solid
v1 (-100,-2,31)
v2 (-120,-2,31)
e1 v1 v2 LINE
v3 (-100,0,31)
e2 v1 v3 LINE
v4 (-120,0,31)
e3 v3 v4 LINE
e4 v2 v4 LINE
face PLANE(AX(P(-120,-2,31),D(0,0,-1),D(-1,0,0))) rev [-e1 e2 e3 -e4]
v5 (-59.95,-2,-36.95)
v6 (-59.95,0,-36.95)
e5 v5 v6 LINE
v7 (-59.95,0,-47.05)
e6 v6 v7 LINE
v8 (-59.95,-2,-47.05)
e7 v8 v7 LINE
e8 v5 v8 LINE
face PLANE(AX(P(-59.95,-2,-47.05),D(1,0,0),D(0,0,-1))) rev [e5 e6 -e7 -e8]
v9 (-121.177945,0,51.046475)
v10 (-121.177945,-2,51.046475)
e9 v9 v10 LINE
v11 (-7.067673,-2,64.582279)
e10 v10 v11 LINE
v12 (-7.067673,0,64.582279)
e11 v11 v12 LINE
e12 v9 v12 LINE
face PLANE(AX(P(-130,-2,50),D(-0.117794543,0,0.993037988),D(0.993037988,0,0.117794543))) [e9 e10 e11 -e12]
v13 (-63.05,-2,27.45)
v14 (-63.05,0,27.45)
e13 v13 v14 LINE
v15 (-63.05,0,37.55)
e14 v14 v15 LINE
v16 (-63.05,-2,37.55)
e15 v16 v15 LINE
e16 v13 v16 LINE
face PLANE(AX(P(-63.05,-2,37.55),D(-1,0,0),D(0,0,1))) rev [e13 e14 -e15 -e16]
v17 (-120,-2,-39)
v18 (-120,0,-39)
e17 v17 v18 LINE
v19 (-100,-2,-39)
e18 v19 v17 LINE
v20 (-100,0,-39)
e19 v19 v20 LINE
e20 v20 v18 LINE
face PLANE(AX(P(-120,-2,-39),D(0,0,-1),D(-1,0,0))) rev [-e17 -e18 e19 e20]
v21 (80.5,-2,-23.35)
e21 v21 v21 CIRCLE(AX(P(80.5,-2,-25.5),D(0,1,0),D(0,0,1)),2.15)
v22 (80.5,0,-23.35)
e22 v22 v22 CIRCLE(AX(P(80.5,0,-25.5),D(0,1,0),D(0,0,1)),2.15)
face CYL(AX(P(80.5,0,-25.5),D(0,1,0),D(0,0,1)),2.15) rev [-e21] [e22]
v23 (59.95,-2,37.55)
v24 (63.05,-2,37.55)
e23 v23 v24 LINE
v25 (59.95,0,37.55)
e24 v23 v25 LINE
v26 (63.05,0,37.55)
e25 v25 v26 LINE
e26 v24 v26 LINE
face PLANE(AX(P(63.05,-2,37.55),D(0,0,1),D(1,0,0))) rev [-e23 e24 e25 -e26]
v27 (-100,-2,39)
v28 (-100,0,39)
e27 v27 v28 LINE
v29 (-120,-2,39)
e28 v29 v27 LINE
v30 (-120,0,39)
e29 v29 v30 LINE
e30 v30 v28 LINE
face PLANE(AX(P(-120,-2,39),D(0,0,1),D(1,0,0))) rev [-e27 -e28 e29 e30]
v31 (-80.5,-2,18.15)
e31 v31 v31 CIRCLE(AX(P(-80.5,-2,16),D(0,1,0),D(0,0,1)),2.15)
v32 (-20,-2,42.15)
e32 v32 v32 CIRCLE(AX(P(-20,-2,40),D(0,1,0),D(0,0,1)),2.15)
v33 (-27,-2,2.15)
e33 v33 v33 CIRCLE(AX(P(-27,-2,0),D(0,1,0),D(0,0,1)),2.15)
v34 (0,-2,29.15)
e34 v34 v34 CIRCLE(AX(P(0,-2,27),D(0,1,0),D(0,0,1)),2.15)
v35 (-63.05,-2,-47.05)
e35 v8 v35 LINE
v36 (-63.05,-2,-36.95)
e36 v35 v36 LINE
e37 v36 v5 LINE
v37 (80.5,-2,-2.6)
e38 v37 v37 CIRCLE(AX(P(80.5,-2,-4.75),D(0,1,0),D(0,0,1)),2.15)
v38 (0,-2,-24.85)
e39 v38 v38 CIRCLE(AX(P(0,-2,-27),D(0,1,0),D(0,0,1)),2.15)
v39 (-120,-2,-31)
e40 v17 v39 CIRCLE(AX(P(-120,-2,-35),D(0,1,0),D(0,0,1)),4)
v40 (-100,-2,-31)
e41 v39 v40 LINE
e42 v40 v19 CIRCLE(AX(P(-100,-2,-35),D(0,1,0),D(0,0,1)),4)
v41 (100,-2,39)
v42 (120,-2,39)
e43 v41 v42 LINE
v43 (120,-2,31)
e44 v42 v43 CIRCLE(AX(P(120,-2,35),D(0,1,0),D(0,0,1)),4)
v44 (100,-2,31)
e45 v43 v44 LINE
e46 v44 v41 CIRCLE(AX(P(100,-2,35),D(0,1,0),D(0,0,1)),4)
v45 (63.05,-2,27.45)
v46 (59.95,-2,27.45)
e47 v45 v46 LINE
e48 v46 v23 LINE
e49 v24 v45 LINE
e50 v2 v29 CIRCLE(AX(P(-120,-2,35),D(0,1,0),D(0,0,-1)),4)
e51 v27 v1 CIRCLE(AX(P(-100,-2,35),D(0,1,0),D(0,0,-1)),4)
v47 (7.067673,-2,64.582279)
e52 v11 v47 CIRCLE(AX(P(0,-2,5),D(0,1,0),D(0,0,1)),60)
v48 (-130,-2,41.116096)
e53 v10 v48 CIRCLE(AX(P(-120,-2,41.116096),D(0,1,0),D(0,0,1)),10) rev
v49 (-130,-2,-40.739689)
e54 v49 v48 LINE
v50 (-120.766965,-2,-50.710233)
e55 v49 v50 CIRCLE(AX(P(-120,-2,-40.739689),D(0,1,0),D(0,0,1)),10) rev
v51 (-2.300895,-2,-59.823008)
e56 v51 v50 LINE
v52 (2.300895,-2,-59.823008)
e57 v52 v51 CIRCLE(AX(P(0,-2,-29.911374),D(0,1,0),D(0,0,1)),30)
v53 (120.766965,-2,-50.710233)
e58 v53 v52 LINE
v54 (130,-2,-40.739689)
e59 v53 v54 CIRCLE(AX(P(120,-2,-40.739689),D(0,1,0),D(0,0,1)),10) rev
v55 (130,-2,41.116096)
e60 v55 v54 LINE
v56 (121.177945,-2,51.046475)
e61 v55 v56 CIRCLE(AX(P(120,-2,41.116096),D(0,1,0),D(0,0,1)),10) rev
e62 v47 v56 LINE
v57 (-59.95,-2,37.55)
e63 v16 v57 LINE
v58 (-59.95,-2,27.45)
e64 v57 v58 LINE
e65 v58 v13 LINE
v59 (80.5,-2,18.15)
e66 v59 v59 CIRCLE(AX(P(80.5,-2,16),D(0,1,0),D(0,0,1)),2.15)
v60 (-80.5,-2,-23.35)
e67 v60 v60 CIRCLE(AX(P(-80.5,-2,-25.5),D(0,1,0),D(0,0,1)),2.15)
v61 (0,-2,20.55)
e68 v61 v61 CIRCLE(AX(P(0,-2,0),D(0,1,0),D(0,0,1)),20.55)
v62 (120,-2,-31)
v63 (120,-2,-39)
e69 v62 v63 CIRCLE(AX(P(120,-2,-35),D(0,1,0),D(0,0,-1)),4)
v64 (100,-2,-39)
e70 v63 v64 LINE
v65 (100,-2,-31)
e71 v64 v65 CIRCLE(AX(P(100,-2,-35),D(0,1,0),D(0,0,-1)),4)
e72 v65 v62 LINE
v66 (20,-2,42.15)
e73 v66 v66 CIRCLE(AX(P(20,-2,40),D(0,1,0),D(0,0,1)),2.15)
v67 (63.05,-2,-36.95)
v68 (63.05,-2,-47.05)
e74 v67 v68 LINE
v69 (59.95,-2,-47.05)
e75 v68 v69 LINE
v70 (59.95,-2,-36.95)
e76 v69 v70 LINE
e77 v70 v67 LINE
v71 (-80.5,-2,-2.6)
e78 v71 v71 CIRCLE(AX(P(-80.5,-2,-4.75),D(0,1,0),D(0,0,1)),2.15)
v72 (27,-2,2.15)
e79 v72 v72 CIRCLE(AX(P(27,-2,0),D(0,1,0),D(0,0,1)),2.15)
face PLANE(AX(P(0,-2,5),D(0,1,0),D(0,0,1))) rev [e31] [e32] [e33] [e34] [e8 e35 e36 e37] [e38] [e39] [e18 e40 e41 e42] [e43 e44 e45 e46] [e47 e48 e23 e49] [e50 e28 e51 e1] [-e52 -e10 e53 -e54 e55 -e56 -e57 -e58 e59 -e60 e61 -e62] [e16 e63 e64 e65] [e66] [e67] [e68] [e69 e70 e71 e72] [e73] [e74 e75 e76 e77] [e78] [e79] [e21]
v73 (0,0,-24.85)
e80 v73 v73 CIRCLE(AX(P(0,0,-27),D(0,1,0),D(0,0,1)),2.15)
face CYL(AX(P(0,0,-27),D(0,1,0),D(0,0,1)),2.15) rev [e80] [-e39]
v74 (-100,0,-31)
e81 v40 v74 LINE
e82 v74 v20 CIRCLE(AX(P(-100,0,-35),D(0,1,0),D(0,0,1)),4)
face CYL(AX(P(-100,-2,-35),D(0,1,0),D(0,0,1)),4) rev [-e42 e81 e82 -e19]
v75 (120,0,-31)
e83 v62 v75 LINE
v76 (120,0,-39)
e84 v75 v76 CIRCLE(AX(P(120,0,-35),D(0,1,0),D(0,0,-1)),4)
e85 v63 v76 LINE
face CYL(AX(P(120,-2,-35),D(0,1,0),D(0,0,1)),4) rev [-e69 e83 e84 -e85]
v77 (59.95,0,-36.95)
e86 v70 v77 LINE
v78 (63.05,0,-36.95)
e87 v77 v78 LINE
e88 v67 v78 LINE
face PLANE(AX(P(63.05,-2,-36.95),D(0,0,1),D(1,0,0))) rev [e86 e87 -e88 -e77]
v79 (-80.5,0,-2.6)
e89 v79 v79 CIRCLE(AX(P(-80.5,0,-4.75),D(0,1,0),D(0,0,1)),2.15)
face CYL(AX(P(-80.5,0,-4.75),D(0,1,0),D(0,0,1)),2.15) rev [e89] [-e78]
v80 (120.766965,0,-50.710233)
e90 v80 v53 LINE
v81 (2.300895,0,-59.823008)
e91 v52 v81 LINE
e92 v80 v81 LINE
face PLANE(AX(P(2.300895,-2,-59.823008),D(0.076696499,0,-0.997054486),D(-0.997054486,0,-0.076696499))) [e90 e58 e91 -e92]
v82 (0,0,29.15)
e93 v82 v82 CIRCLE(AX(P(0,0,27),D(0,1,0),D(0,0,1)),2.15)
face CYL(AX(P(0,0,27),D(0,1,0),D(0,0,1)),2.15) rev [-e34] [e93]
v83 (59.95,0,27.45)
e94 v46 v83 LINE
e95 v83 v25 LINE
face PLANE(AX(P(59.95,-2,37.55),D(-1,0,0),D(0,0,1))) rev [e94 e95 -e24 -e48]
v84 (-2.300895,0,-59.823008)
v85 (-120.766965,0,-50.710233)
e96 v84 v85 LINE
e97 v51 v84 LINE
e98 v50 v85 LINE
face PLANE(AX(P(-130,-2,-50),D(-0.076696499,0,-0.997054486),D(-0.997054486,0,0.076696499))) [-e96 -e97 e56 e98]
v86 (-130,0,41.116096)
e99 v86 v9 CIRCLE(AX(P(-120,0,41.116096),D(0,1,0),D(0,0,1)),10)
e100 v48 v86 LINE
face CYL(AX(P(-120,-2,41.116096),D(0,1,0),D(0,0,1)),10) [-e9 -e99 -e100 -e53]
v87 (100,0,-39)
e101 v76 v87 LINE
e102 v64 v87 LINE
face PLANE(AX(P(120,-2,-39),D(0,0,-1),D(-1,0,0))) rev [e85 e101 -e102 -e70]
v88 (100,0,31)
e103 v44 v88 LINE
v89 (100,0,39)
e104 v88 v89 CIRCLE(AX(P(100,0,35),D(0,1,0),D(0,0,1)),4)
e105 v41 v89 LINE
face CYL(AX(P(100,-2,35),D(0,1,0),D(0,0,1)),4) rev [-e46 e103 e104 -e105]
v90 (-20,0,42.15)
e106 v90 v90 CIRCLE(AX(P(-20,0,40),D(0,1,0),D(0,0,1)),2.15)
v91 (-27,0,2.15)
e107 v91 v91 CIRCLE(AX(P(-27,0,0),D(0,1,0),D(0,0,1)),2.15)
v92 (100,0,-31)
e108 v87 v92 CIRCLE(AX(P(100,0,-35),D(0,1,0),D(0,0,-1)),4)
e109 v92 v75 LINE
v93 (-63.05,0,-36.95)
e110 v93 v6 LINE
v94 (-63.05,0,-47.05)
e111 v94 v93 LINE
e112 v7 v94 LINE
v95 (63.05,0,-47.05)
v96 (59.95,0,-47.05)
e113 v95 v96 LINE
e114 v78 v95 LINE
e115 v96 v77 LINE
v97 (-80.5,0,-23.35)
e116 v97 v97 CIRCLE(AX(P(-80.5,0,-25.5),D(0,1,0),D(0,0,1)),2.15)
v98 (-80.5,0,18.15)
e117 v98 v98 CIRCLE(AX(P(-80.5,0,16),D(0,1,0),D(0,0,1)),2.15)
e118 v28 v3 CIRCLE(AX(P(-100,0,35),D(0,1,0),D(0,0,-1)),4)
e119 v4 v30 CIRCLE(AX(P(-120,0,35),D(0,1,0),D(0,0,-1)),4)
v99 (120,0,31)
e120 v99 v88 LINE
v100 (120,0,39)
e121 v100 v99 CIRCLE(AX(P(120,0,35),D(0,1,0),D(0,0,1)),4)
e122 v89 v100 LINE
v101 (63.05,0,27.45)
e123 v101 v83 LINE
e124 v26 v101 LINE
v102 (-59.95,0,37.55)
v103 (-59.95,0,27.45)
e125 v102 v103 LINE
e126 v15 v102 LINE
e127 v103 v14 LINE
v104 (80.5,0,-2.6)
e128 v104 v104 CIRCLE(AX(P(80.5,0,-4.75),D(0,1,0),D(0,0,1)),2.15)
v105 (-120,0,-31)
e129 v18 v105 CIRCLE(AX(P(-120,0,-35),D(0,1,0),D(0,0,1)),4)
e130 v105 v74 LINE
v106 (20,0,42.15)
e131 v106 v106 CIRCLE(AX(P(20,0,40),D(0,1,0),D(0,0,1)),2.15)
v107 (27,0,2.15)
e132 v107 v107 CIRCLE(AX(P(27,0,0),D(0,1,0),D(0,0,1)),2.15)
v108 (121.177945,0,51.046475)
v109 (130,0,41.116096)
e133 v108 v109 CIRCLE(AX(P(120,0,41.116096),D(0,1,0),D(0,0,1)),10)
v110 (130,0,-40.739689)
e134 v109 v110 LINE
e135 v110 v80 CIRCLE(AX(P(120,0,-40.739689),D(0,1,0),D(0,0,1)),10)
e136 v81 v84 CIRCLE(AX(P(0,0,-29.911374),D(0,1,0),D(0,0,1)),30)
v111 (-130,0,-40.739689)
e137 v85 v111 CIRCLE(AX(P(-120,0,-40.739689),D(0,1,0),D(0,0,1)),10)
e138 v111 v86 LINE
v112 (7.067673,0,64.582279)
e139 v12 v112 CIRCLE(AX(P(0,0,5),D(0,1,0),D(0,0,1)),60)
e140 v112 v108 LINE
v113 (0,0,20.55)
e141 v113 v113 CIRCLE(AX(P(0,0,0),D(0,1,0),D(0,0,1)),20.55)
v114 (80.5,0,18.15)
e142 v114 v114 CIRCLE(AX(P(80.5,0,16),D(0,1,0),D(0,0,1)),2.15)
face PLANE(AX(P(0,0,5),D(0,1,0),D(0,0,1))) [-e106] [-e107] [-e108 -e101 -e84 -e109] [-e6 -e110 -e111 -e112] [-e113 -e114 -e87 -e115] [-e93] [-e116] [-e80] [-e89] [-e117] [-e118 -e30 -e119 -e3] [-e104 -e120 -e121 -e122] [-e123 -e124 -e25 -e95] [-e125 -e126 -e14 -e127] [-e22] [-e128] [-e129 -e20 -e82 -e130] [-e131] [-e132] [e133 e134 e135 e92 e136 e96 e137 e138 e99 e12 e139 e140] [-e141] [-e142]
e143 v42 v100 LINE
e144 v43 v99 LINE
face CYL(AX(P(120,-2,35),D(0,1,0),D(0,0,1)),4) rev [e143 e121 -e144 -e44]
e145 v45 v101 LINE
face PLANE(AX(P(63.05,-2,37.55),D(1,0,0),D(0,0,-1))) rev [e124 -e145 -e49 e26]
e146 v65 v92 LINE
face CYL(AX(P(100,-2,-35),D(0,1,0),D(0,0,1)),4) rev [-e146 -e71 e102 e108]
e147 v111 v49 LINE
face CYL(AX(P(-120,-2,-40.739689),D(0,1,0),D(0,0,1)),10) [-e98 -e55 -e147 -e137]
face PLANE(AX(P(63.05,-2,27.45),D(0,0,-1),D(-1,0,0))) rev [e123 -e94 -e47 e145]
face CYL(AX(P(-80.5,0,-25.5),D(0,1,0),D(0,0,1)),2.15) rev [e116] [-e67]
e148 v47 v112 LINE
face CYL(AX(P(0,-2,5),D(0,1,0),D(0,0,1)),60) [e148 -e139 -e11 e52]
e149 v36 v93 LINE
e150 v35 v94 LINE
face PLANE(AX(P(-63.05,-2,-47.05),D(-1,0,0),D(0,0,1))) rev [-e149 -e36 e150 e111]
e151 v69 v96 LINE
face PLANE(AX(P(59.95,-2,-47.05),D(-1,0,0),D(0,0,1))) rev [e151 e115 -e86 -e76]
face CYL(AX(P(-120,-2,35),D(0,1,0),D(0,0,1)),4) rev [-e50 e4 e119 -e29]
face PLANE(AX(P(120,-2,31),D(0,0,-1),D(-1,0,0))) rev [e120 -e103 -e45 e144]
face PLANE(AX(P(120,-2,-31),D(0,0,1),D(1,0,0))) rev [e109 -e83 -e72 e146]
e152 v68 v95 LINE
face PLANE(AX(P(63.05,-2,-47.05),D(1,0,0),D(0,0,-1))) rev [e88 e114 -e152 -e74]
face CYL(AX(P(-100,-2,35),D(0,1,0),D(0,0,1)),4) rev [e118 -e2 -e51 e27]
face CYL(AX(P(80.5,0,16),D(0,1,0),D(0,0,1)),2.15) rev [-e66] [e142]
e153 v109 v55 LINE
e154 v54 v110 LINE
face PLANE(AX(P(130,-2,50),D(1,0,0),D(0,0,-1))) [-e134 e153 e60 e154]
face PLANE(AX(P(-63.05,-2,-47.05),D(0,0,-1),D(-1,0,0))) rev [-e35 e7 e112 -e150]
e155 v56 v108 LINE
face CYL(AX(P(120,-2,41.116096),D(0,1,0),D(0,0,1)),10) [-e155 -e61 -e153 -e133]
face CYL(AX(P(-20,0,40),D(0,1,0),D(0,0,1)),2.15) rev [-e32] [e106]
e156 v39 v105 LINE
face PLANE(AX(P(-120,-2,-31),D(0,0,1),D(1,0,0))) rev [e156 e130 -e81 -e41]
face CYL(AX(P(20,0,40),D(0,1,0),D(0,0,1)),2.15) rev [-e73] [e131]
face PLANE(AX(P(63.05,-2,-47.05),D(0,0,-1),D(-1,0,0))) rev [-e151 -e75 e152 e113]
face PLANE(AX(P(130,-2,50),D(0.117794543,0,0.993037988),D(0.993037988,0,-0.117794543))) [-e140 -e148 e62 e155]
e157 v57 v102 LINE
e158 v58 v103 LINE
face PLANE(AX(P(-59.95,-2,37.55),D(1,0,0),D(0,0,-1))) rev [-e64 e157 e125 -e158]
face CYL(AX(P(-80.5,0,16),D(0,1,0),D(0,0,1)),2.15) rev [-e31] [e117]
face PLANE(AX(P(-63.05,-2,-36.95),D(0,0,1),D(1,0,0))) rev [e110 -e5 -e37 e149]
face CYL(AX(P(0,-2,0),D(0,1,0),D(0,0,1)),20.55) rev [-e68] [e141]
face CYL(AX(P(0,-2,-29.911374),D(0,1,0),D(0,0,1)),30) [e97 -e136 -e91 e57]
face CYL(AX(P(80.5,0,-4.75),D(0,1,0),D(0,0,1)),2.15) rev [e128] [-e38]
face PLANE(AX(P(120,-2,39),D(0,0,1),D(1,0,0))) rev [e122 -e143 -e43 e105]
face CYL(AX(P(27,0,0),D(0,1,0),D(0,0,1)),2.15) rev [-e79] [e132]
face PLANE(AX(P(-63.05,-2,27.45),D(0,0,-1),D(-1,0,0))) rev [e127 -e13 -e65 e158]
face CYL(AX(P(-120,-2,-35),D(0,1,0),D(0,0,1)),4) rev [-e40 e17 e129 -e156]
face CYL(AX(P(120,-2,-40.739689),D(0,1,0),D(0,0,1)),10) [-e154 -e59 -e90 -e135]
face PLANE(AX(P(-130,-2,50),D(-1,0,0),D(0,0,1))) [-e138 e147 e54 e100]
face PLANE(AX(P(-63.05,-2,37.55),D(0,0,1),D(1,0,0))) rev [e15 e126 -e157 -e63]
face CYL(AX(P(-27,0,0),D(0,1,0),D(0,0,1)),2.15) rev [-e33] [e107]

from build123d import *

# Parameters (mm, degrees)
SKETCH1_R                = 20.55
SKETCH1_R_2              = 1
SKETCH1_W                = 3.1
SKETCH1_H                = 10.1
BASE_FLANGE1_DEPTH       = 2
FILLET1_R                = 10
M4_CLEARANCE_HOLE2_D     = 4.3
M4_CLEARANCE_HOLE2_DEPTH = 136
M4_CLEARANCE_HOLE2_TIP   = 1.291850331


# Sheet-metal steps are written as plain solids
with BuildPart() as part:
    # Sketch1 → Base-Flange1 (new body)
    with BuildSketch(Plane(origin=(0, 0, 0), x_dir=(1, 0, 0), z_dir=(0, 1, 0))):
        with BuildLine():
            Line((-130, -50), (-130, 50))
            Line((-130, 50), (-2.300894967, 59.823008079))
            ThreePointArc((-2.300894967, 59.823008079), (0, 59.911373514), (2.300894967, 59.823008079))
            Line((2.300894967, 59.823008079), (130, 50))
            Line((130, 50), (130, -50))
            Line((130, -50), (7.067672556, -64.582279284))
            ThreePointArc((7.067672556, -64.582279284), (0, -65), (-7.067672556, -64.582279284))
            Line((-7.067672556, -64.582279284), (-130, -50))
        make_face()
        with Locations(Location((0, 0, 0), (0, 0, 270))):
            Circle(SKETCH1_R, mode=Mode.SUBTRACT)
        with Locations(Location((0, 27, 0), (0, 0, 270))):
            Circle(SKETCH1_R_2, mode=Mode.SUBTRACT)
        with Locations(Location((-80.5, 25.5, 0), (0, 0, 270))):
            Circle(SKETCH1_R_2, mode=Mode.SUBTRACT)
        with Locations(Location((-80.5, 4.75, 0), (0, 0, 270))):
            Circle(SKETCH1_R_2, mode=Mode.SUBTRACT)
        with Locations(Location((-80.5, -16, 0), (0, 0, 270))):
            Circle(SKETCH1_R_2, mode=Mode.SUBTRACT)
        with Locations(Location((80.5, -16, 0), (0, 0, 90))):
            Circle(SKETCH1_R_2, mode=Mode.SUBTRACT)
        with Locations(Location((80.5, 4.75, 0), (0, 0, 90))):
            Circle(SKETCH1_R_2, mode=Mode.SUBTRACT)
        with Locations(Location((80.5, 25.5, 0), (0, 0, 90))):
            Circle(SKETCH1_R_2, mode=Mode.SUBTRACT)
        with Locations(Location((27, 0, 0), (0, 0, 270))):
            Circle(SKETCH1_R_2, mode=Mode.SUBTRACT)
        with Locations(Location((0, -27, 0), (0, 0, 270))):
            Circle(SKETCH1_R_2, mode=Mode.SUBTRACT)
        with Locations(Location((-27, 0, 0), (0, 0, 270))):
            Circle(SKETCH1_R_2, mode=Mode.SUBTRACT)
        with Locations(Location((20, -40, 0), (0, 0, 270))):
            Circle(SKETCH1_R_2, mode=Mode.SUBTRACT)
        with Locations(Location((-20, -40, 0), (0, 0, 270))):
            Circle(SKETCH1_R_2, mode=Mode.SUBTRACT)
        with Locations((-61.5, 42)):
            Rectangle(SKETCH1_W, SKETCH1_H, mode=Mode.SUBTRACT)
        with Locations((-61.5, -32.5)):
            Rectangle(SKETCH1_W, SKETCH1_H, mode=Mode.SUBTRACT)
        with Locations((61.5, -32.5)):
            Rectangle(SKETCH1_W, SKETCH1_H, mode=Mode.SUBTRACT)
        with Locations((61.5, 42)):
            Rectangle(SKETCH1_W, SKETCH1_H, mode=Mode.SUBTRACT)
        with BuildLine():
            Line((-120, 39), (-100, 39))
            ThreePointArc((-100, 39), (-96, 35), (-100, 31))
            Line((-100, 31), (-120, 31))
            ThreePointArc((-120, 31), (-124, 35), (-120, 39))
        make_face(mode=Mode.SUBTRACT)
        with BuildLine():
            Line((120, 39), (100, 39))
            ThreePointArc((100, 39), (96, 35), (100, 31))
            Line((100, 31), (120, 31))
            ThreePointArc((120, 31), (124, 35), (120, 39))
        make_face(mode=Mode.SUBTRACT)
        with BuildLine():
            Line((120, -39), (100, -39))
            ThreePointArc((100, -39), (96, -35), (100, -31))
            Line((100, -31), (120, -31))
            ThreePointArc((120, -31), (124, -35), (120, -39))
        make_face(mode=Mode.SUBTRACT)
        with BuildLine():
            Line((-120, -39), (-100, -39))
            ThreePointArc((-100, -39), (-96, -35), (-100, -31))
            Line((-100, -31), (-120, -31))
            ThreePointArc((-120, -31), (-124, -35), (-120, -39))
        make_face(mode=Mode.SUBTRACT)
    extrude(amount=-BASE_FLANGE1_DEPTH)

    # Fillet1
    fillet1_edges = [part.edges().sort_by_distance(p)[0] for p in [
        (130, -1, -50),
        (130, -1, 50),
        (-130, -1, 50),
        (-130, -1, -50),
    ]]
    fillet(fillet1_edges, radius=FILLET1_R)

    # M4 Clearance Hole2
    with Locations(Plane(origin=(0, 0, 0), x_dir=(1, 0, 0), z_dir=(0, 1, 0))):
        with Locations((-27, 0), (0, 27), (27, 0), (0, -27), (20, -40), (-20, -40), (80.5, -16), (80.5, 25.5), (80.5, 4.75), (-80.5, 25.5), (-80.5, 4.75), (-80.5, -16)):
            Hole(M4_CLEARANCE_HOLE2_D / 2, depth=M4_CLEARANCE_HOLE2_DEPTH)
            with Locations((0, 0, -(M4_CLEARANCE_HOLE2_DEPTH + M4_CLEARANCE_HOLE2_TIP / 2))):  # 118° drill point
                Cone(0, M4_CLEARANCE_HOLE2_D / 2, M4_CLEARANCE_HOLE2_TIP, mode=Mode.SUBTRACT)


solid = part.part
